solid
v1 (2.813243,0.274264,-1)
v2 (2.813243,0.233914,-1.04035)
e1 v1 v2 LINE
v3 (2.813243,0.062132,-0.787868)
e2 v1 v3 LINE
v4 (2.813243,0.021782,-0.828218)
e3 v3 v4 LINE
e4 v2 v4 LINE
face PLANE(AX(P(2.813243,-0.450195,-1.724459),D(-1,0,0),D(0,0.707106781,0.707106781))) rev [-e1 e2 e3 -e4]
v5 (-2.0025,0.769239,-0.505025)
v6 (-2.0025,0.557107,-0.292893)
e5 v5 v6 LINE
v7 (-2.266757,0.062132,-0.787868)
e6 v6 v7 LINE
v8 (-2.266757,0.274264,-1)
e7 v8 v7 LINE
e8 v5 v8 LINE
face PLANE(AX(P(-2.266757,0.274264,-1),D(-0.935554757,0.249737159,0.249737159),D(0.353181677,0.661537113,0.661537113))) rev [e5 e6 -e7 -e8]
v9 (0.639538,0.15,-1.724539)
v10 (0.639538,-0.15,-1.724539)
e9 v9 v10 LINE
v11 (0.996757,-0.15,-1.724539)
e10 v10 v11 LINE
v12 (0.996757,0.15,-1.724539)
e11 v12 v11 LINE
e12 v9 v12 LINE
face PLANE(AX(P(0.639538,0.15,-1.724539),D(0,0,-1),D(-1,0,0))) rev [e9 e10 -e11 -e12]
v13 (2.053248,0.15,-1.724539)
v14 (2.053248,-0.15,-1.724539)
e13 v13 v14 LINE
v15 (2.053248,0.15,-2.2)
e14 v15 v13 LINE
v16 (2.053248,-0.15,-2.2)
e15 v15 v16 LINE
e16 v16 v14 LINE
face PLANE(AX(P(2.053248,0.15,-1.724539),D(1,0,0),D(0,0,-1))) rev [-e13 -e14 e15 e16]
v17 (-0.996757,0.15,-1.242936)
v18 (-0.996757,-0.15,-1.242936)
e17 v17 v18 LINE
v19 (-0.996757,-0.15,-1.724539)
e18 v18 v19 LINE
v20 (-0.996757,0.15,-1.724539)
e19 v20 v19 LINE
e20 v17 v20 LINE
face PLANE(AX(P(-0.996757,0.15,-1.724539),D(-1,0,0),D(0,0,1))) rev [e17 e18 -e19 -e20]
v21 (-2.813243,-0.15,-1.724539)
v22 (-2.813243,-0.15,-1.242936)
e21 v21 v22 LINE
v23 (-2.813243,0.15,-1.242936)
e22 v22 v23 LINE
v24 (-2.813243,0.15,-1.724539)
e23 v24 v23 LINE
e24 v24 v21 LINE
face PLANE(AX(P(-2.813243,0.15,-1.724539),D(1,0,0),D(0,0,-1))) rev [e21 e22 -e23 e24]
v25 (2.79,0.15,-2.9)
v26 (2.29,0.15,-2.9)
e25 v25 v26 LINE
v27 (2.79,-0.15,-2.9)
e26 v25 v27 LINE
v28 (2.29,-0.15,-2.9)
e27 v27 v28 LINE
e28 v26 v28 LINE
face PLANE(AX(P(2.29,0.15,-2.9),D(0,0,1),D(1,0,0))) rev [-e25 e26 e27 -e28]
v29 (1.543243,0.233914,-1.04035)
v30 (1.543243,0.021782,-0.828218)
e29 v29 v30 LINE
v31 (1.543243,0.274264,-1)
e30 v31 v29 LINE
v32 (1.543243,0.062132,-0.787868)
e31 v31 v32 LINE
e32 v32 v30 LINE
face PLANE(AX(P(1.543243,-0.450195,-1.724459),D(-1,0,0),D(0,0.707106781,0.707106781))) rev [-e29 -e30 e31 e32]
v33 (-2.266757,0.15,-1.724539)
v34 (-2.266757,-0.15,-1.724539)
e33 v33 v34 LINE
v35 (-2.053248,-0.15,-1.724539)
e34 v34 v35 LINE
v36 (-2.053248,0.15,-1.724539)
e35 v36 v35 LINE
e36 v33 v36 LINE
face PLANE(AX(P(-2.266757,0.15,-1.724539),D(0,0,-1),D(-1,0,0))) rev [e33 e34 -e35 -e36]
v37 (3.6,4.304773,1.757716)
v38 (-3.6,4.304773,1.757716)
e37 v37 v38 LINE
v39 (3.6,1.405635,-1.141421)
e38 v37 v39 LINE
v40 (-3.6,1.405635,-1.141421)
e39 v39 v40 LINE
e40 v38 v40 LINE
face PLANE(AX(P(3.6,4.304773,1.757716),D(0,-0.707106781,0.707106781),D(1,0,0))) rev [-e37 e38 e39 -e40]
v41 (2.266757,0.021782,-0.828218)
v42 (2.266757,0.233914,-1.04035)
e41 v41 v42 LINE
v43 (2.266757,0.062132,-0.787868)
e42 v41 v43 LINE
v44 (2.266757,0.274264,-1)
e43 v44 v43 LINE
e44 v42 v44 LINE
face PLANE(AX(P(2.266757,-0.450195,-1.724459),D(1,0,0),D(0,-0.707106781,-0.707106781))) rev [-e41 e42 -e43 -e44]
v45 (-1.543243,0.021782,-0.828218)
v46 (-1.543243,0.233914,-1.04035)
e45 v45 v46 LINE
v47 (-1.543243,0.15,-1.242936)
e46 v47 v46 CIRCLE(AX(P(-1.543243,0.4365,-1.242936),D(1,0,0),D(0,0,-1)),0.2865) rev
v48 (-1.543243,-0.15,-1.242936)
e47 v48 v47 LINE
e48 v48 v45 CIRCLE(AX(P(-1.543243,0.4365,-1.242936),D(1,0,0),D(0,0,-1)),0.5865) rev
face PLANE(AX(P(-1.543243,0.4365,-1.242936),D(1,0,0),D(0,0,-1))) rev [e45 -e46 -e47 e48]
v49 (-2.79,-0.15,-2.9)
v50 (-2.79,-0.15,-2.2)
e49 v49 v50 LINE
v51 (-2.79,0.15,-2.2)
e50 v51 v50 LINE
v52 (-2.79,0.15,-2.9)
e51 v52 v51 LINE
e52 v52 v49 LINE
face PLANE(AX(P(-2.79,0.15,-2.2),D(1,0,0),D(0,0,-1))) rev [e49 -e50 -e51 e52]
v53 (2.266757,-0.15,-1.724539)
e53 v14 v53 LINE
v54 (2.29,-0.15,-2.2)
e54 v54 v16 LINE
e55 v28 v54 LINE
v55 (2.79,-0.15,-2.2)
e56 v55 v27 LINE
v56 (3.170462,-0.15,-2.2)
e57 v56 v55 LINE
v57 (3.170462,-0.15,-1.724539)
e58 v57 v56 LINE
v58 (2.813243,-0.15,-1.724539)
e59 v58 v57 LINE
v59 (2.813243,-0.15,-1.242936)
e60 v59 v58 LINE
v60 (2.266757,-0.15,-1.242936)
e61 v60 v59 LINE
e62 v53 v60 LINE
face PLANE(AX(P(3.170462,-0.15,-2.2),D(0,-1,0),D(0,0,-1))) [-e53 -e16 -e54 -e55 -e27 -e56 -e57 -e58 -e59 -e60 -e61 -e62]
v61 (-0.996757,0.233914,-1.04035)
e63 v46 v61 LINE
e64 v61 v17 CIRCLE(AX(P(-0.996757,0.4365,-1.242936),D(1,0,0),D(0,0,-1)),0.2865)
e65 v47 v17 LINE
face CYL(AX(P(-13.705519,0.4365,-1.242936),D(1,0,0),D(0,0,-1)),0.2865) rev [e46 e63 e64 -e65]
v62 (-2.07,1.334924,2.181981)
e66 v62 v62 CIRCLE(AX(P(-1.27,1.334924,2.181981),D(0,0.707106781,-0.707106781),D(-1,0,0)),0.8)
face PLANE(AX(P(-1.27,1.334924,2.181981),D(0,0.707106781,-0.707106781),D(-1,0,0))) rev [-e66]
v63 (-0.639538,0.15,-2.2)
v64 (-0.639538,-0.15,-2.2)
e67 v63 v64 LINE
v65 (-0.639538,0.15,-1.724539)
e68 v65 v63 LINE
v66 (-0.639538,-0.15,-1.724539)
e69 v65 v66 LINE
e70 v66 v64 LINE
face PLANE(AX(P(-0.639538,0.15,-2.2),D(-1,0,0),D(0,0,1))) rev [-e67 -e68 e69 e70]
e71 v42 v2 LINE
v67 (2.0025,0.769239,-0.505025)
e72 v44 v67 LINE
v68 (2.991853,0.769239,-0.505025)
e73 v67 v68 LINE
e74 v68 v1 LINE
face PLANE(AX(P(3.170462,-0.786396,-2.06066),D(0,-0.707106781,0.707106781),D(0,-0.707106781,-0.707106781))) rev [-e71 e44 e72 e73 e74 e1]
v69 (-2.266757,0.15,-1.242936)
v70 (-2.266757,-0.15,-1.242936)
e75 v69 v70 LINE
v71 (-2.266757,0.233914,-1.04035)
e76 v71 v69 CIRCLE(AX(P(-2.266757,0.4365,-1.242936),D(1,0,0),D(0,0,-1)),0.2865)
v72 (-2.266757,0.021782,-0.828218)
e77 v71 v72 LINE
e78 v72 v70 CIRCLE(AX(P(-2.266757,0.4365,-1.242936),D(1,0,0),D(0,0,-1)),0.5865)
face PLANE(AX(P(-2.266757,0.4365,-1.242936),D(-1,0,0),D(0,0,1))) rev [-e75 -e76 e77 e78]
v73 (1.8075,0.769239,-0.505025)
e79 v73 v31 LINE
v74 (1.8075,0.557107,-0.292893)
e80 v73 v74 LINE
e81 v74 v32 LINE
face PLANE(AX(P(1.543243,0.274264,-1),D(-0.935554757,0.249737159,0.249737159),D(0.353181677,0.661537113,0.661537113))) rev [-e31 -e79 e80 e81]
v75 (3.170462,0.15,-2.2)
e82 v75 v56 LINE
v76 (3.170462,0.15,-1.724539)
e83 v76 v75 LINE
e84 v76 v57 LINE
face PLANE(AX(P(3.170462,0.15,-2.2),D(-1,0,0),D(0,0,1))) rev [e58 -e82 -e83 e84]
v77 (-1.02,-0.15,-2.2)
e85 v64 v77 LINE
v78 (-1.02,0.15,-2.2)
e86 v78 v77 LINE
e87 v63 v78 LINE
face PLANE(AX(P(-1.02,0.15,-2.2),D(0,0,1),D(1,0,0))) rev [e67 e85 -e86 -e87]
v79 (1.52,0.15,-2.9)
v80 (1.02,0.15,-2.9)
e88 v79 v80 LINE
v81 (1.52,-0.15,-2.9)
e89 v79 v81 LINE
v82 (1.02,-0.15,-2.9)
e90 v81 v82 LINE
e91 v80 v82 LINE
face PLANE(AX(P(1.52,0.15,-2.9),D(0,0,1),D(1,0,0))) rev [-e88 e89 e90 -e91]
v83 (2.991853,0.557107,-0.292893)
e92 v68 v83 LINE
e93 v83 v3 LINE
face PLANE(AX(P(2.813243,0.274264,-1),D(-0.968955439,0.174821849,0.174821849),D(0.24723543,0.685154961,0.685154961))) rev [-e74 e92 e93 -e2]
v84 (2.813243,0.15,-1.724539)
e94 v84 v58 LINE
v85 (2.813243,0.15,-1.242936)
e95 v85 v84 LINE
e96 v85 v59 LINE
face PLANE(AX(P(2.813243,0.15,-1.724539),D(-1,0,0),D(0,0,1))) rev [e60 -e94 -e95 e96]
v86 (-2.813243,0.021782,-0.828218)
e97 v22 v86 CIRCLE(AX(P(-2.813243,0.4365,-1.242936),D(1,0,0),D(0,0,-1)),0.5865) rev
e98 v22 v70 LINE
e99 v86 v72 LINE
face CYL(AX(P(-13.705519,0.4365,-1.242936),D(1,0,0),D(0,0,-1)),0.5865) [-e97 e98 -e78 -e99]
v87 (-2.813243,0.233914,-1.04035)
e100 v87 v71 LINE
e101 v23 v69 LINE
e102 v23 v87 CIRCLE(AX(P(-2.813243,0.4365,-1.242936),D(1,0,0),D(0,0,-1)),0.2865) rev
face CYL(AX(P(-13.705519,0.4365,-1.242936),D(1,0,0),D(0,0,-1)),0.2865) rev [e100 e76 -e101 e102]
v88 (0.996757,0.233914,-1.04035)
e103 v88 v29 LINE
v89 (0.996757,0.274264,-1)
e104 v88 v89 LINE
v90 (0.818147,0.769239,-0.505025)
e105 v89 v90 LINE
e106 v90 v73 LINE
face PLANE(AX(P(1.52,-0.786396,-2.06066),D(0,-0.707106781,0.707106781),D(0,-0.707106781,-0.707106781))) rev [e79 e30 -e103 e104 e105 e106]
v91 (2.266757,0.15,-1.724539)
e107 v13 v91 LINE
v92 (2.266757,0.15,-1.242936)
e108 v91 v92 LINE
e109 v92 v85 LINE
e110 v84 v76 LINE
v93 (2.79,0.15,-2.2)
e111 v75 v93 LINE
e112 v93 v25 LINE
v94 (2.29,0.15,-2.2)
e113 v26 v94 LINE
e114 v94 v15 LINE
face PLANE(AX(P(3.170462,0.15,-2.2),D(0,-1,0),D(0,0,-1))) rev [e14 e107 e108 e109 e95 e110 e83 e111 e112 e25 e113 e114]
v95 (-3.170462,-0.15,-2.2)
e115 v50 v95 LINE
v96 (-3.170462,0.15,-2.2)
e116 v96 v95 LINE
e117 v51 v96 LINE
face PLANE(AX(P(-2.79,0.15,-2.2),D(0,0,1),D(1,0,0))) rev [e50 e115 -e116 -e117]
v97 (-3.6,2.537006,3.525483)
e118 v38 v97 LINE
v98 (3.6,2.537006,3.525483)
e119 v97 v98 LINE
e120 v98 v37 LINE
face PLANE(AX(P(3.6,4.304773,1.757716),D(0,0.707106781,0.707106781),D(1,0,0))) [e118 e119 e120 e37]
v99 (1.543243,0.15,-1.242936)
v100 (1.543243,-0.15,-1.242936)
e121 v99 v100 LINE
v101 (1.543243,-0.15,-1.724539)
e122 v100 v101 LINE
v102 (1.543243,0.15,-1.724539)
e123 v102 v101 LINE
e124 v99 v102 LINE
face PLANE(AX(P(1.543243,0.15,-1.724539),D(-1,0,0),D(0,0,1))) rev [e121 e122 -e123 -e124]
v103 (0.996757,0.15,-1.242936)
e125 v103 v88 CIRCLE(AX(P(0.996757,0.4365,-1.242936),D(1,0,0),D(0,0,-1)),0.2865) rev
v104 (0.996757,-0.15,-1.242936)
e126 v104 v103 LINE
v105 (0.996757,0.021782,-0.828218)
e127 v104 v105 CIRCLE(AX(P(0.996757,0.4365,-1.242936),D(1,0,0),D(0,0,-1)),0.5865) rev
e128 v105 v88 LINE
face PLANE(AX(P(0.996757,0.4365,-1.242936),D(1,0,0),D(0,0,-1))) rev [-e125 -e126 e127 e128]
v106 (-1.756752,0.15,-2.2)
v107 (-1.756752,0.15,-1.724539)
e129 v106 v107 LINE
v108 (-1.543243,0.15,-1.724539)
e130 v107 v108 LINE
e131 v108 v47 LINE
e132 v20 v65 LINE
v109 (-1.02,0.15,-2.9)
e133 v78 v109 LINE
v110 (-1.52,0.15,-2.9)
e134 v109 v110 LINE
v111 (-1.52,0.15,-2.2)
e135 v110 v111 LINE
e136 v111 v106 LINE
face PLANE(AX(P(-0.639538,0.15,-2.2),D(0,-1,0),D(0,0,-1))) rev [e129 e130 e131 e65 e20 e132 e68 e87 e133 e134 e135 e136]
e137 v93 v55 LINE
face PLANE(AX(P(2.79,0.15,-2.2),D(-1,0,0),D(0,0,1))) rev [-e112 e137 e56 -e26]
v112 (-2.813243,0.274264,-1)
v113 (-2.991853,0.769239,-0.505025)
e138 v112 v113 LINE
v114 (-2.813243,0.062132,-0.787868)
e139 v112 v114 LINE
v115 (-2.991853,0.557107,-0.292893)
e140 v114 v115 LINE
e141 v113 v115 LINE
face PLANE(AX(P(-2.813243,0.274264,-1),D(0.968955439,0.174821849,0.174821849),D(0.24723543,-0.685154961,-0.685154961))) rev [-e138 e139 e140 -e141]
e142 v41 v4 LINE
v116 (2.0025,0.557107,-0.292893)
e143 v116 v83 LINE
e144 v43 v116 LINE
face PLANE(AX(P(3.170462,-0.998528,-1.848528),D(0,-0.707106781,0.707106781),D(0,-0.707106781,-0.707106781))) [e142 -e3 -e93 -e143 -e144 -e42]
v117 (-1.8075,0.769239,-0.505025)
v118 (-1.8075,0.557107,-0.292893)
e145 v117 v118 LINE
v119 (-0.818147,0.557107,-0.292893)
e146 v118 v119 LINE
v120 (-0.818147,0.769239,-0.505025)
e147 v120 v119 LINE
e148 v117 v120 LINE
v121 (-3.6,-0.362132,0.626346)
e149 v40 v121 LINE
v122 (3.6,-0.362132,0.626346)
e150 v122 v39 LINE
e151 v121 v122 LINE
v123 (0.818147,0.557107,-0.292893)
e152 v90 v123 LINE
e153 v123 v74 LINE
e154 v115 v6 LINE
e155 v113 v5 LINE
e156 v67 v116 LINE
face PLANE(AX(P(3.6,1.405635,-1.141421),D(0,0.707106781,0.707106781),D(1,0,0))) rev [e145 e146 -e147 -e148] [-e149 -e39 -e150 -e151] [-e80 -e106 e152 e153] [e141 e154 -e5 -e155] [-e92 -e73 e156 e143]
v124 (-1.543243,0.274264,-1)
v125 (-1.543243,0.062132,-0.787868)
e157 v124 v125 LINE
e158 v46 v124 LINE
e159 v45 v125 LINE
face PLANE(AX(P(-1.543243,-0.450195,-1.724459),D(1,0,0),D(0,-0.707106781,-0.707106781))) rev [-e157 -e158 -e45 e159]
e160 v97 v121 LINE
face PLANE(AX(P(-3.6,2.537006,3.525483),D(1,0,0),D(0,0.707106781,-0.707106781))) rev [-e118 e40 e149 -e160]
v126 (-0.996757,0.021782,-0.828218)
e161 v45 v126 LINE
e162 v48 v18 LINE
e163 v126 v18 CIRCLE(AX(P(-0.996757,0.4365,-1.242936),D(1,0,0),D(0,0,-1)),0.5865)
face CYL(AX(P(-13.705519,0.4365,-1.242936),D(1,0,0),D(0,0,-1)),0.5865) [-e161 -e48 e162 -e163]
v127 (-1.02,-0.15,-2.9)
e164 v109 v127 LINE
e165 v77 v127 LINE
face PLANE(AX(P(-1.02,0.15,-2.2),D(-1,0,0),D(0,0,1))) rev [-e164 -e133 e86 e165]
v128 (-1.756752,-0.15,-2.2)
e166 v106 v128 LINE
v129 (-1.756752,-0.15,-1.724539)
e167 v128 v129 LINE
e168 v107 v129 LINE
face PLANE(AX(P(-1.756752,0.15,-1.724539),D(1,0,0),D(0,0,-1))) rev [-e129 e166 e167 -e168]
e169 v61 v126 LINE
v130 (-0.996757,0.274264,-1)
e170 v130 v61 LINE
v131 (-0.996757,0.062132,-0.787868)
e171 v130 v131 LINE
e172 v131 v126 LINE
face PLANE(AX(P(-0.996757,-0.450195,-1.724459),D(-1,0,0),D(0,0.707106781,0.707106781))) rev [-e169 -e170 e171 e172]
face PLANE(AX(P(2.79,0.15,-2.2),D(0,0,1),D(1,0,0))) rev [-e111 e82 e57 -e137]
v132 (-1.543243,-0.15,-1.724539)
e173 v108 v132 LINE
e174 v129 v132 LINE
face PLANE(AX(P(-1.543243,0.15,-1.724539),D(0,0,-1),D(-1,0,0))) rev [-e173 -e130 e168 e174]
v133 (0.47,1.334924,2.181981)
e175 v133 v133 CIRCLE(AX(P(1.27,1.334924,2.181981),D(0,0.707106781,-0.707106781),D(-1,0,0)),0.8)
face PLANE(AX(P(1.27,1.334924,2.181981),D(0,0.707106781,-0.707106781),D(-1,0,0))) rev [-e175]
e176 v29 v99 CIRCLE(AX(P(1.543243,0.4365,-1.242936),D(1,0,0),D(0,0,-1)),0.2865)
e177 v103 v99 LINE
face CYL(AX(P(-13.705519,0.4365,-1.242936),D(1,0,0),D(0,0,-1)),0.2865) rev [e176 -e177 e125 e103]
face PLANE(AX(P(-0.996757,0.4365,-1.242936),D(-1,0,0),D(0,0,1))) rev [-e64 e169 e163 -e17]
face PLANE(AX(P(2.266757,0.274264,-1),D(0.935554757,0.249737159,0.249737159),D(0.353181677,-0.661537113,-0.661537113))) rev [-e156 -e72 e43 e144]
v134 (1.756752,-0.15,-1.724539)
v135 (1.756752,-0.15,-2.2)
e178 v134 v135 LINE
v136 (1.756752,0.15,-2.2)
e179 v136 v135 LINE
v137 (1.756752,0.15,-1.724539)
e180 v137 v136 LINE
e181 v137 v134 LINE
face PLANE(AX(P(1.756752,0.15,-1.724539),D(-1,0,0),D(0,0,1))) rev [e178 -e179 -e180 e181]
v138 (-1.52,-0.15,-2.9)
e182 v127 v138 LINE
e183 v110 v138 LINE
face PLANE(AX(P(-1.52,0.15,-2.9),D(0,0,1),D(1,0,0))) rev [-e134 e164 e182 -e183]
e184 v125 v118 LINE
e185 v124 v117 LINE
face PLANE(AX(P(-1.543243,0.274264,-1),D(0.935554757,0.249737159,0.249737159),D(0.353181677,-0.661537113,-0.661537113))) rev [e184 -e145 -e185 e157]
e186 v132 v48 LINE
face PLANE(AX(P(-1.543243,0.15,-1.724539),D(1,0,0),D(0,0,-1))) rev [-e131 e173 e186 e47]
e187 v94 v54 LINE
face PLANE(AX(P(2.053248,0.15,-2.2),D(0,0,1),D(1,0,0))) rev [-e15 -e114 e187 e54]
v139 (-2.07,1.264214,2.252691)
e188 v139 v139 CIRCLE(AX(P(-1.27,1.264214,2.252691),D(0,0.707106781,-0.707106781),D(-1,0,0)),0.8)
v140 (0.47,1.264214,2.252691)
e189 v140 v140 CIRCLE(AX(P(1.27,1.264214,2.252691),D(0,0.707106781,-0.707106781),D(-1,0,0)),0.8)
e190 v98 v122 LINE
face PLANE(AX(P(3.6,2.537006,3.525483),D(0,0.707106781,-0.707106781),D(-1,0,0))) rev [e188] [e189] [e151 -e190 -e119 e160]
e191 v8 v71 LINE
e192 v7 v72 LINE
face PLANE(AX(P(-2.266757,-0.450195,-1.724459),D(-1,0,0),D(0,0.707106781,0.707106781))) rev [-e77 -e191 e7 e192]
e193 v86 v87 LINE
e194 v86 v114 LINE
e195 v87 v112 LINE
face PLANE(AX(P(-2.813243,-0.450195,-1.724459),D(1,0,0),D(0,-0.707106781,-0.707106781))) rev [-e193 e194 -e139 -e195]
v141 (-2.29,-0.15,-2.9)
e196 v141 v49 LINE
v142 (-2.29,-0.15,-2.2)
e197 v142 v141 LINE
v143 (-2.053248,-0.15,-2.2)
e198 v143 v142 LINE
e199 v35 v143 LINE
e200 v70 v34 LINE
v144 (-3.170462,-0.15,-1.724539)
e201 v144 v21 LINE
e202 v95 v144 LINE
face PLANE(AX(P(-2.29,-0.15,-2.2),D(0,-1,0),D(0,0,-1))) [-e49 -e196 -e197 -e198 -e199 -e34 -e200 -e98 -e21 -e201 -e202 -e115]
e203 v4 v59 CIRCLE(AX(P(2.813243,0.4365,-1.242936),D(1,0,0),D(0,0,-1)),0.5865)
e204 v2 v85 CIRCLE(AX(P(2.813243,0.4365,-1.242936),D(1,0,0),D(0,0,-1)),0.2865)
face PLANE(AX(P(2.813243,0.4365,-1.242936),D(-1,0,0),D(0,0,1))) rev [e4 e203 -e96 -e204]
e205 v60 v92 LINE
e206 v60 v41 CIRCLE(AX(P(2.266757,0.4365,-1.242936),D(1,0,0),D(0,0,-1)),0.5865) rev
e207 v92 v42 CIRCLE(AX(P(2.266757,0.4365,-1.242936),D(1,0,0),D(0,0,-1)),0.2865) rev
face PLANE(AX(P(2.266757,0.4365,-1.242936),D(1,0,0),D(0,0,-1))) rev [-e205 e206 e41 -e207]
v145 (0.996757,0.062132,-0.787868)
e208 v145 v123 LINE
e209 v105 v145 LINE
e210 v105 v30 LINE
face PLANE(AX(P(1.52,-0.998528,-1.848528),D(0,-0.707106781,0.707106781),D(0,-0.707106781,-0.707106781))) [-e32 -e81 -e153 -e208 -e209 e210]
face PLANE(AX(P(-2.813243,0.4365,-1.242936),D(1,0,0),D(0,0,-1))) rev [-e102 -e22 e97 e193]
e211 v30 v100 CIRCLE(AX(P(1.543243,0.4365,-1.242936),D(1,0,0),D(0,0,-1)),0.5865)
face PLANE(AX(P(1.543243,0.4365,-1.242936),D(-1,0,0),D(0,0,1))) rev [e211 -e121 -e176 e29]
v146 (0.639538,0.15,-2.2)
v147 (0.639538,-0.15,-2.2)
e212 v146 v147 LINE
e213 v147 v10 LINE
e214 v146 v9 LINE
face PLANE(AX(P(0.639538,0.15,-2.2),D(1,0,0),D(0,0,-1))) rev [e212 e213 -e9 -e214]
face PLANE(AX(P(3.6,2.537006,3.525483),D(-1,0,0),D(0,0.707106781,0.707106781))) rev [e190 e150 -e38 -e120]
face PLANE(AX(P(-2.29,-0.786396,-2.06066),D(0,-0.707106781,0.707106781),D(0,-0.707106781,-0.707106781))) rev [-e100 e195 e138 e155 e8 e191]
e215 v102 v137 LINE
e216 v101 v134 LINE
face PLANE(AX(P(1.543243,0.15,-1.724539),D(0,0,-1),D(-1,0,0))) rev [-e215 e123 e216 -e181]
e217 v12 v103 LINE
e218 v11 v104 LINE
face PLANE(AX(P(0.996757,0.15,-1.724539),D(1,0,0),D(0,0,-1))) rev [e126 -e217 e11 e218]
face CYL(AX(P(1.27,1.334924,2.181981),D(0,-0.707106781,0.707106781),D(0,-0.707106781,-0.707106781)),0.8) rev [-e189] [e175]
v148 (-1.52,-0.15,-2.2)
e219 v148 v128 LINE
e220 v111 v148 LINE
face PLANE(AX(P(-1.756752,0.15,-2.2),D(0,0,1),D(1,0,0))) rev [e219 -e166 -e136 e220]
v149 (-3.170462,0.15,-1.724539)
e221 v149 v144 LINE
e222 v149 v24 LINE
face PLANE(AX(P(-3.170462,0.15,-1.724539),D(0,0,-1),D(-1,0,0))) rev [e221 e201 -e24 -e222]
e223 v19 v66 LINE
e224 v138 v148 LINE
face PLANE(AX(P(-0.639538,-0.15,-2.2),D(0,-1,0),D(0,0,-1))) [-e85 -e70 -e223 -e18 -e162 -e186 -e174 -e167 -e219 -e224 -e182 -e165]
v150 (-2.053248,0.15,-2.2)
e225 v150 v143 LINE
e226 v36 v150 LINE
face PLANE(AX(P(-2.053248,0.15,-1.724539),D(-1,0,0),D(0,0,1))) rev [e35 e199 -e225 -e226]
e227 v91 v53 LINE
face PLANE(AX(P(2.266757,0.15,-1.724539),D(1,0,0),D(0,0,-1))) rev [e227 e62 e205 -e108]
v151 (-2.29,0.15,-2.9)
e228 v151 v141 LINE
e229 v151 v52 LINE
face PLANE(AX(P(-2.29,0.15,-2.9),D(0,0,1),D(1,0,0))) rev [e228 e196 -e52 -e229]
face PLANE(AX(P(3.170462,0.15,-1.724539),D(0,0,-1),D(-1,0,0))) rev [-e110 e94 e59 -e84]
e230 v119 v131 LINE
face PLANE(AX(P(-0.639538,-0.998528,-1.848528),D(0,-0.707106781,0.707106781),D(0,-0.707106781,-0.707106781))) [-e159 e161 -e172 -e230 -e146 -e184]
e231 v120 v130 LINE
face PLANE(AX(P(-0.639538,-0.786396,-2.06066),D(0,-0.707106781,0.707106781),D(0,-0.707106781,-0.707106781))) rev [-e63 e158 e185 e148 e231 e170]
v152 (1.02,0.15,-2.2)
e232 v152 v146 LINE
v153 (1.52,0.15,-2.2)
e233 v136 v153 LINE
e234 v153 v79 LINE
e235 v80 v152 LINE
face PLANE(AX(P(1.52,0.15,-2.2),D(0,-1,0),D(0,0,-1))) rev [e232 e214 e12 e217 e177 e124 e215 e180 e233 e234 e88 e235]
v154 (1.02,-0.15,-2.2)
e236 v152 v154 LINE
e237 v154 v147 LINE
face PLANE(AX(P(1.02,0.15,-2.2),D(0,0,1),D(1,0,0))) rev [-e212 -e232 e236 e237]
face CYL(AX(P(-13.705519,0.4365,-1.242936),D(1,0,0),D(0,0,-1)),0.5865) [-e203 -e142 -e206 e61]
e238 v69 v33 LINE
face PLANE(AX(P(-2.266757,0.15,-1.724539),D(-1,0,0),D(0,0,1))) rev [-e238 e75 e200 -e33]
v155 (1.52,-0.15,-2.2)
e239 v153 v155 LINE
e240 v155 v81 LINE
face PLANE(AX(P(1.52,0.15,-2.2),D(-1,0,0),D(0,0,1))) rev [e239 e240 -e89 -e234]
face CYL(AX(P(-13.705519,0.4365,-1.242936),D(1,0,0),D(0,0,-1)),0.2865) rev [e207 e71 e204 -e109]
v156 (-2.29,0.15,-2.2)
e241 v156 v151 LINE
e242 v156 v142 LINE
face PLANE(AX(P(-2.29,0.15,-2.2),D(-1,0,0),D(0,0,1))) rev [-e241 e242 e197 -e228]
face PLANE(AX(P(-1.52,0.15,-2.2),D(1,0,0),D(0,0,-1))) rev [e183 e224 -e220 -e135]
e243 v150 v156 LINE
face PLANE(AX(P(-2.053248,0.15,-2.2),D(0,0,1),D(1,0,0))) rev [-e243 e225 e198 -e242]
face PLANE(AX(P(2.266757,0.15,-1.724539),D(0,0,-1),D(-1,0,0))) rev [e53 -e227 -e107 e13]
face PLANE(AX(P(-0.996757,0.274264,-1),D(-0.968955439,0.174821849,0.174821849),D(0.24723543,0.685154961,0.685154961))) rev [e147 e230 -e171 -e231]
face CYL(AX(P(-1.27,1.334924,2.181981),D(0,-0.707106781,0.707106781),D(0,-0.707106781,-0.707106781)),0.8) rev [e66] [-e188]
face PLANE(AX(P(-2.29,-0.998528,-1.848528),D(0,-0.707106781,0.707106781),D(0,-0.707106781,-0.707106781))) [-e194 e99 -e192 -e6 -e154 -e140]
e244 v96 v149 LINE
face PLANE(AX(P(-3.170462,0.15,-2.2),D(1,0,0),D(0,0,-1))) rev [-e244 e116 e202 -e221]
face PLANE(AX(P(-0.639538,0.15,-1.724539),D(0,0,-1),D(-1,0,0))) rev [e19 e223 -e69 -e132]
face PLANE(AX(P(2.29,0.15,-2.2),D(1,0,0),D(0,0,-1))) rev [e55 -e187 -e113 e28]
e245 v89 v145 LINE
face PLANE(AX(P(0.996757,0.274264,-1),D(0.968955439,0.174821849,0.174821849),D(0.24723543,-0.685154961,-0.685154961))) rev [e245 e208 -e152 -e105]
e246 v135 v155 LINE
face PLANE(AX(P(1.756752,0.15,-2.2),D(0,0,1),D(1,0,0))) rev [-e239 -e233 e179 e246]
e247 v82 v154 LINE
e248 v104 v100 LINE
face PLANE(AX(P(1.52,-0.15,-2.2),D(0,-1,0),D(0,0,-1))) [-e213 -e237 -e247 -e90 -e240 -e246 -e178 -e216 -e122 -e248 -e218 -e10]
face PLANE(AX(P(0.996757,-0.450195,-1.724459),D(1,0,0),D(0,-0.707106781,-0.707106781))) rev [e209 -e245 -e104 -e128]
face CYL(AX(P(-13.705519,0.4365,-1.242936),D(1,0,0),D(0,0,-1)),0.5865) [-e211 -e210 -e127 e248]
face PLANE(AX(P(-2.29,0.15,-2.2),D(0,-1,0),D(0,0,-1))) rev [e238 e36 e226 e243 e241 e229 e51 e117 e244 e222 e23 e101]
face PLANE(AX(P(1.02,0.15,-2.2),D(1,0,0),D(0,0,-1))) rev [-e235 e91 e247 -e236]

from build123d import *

# Parameters (mm, degrees)
ESQUISSE2_W          = 7.2
ESQUISSE2_H          = 2.5
BOITIER_DEPTH        = 4.1
FENETRECAPTEUR_START = -1.45
ESQUISSE4_R          = 0.8
FENETRECAPTEUR_DEPTH = 0.1
PATTES_DEPTH         = 0.15
PLIAGE_START         = -5
PLIAGE_1_OUTLINE_W   = 7.2
PLIAGE_1_OUTLINE_H   = 4.1
PLIAGE_1_DEPTH       = 4.301040764
PLIAGE_START_2       = -0.698959236
PLIAGE_1_2_OUTLINE_R = 0.8
PLIAGE_1_2_DEPTH     = 0.1
PLIAGE_START_3       = -0.598959236
PLIAGE_1_3_OUTLINE_W = 7.2
PLIAGE_1_3_OUTLINE_H = 4.1
PLIAGE_1_3_DEPTH     = 2.4
PLIAGE_1_4_OUTLINE_W = 7.2
PLIAGE_1_4_OUTLINE_H = 4.1
PLIAGE_1_4_OUTLINE_R = 0.8
PLIAGE_1_4_DEPTH     = 0.1
PLIAGE_START_4       = -3.6
PLIAGE_1_5_DEPTH     = 7.2
PLIAGE_START_5       = -2.813242849
PLIAGE_1_6_DEPTH     = 0.546485698
PLIAGE_START_6       = -1.543242849
PLIAGE_1_7_DEPTH     = 0.546485698
PLIAGE_START_7       = 0.996757151
PLIAGE_1_8_DEPTH     = 0.546485698
PLIAGE_START_8       = 2.266757151
PLIAGE_1_9_DEPTH     = 0.546485698
PLIAGE_START_9       = 0.601040763
PLIAGE_1_10_DEPTH    = 0.300000001


with BuildPart() as part:
    # Esquisse2 → Boitier (new body)
    with BuildSketch(Plane.XY):
        with Locations((0, -0.2)):
            Rectangle(ESQUISSE2_W, ESQUISSE2_H)
    extrude(amount=BOITIER_DEPTH)

    # Esquisse4 → FenetreCapteur (cut)
    with BuildSketch(Plane(origin=(0, 0, 0), x_dir=(1, 0, 0), z_dir=(0, 1, 0)).offset(FENETRECAPTEUR_START)):
        with Locations(Location((-1.27, -2.3, 0), (0, 0, 180))):
            Circle(ESQUISSE4_R)
        with Locations(Location((1.27, -2.3, 0), (0, 0, 180))):
            Circle(ESQUISSE4_R)
    extrude(amount=FENETRECAPTEUR_DEPTH, mode=Mode.SUBTRACT)

    # Esquisse5 → Pattes (add, symmetric)
    with BuildSketch(Plane(origin=(0, 0, 0), x_dir=(1, 0, 0), z_dir=(0, 1, 0))):
        Polygon((2.79, 2.2), (2.79, 2.9), (2.29, 2.9), (2.29, 2.2), (2.053248267, 2.2), (2.053248267, 1.724539267), (2.266757151, 1.724539267), (2.266757151, 0.7), (2.002499851, 0), (2.991852509, 0), (2.813242849, 0.7), (2.813242849, 1.724539267), (3.170462168, 1.724539267), (3.170462168, 2.2), align=None)
        Polygon((1.52, 2.2), (1.52, 2.9), (1.02, 2.9), (1.02, 2.2), (0.639537832, 2.2), (0.639537832, 1.724539267), (0.996757151, 1.724539267), (0.996757151, 0.7), (0.818147491, 0), (1.807500149, 0), (1.543242849, 0.7), (1.543242849, 1.724539267), (1.756751733, 1.724539267), (1.756751733, 2.2), align=None)
        Polygon((-1.02, 2.2), (-1.02, 2.9), (-1.52, 2.9), (-1.52, 2.2), (-1.756751733, 2.2), (-1.756751733, 1.724539267), (-1.543242849, 1.724539267), (-1.543242849, 0.7), (-1.807500149, 0), (-0.818147491, 0), (-0.996757151, 0.7), (-0.996757151, 1.724539267), (-0.639537832, 1.724539267), (-0.639537832, 2.2), align=None)
        Polygon((-2.29, 2.2), (-2.29, 2.9), (-2.79, 2.9), (-2.79, 2.2), (-3.170462168, 2.2), (-3.170462168, 1.724539267), (-2.813242849, 1.724539267), (-2.813242849, 0.7), (-2.991852509, 0), (-2.002499851, 0), (-2.266757151, 0.7), (-2.266757151, 1.724539267), (-2.053248267, 1.724539267), (-2.053248267, 2.2), align=None)
    extrude(amount=PATTES_DEPTH, both=True)

    # Pliage 1: read off the stored shape, not the designer's step
    # Pliage 1 outline → Pliage 1 (cut)
    with BuildSketch(Plane(origin=(0, 0, 0), x_dir=(1, 0, 0), z_dir=(0, 0.707106781186546, -0.707106781186549)).offset(PLIAGE_START)):
        with Locations((0, -2.236827202)):
            Rectangle(PLIAGE_1_OUTLINE_W, PLIAGE_1_OUTLINE_H)
    extrude(amount=PLIAGE_1_DEPTH, mode=Mode.SUBTRACT)

    # Pliage 1 2 outline → Pliage 1 2 (cut)
    with BuildSketch(Plane(origin=(0, 0, 0), x_dir=(1, 0, 0), z_dir=(0, 0.707106781186546, -0.707106781186549)).offset(PLIAGE_START_2)):
        with Locations((-1.27, -2.486827202)):
            Circle(PLIAGE_1_2_OUTLINE_R)
        with Locations((1.27, -2.486827202)):
            Circle(PLIAGE_1_2_OUTLINE_R)
    extrude(amount=PLIAGE_1_2_DEPTH, mode=Mode.SUBTRACT)

    # Pliage 1 3 outline → Pliage 1 3 (add)
    with BuildSketch(Plane(origin=(0, 0, 0), x_dir=(1, 0, 0), z_dir=(0, 0.707106781186546, -0.707106781186549)).offset(PLIAGE_START_3)):
        with Locations((0, -2.236827202)):
            Rectangle(PLIAGE_1_3_OUTLINE_W, PLIAGE_1_3_OUTLINE_H)
    extrude(amount=PLIAGE_1_3_DEPTH)

    # Pliage 1 4 outline → Pliage 1 4 (add)
    with BuildSketch(Plane(origin=(0, 0, 0), x_dir=(1, 0, 0), z_dir=(0, 0.707106781186546, -0.707106781186549)).offset(PLIAGE_START_2)):
        with Locations((0, -2.236827202)):
            Rectangle(PLIAGE_1_4_OUTLINE_W, PLIAGE_1_4_OUTLINE_H)
        with Locations((-1.27, -2.486827202)):
            Circle(PLIAGE_1_4_OUTLINE_R, mode=Mode.SUBTRACT)
        with Locations((1.27, -2.486827202)):
            Circle(PLIAGE_1_4_OUTLINE_R, mode=Mode.SUBTRACT)
    extrude(amount=PLIAGE_1_4_DEPTH)

    # Pliage 1 5 outline → Pliage 1 5 (cut)
    with BuildSketch(Plane.YZ.offset(PLIAGE_START_4)):
        with BuildLine():
            Line((0.021781873, -0.828218127), (0.15, -0.7))
            Line((0.15, -0.7), (0.15, 0))
            Line((0.15, 0), (0.264213563, 0))
            Line((0.264213563, 0), (-1.35, 1.614213563))
            Line((-1.35, 1.614213563), (-1.45, 1.714213563))
            Line((-1.45, 1.714213563), (-1.45, 0))
            Line((-1.45, 0), (-0.15, 0))
            Line((-0.15, 0), (-0.15, -1.242936254))
            ThreePointArc((-0.15, -1.242936254), (-0.105355346, -1.018492421), (0.021781873, -0.828218127))
        make_face()
    extrude(amount=PLIAGE_1_5_DEPTH, mode=Mode.SUBTRACT)

    # Pliage 1 6 outline → Pliage 1 6 (add)
    with BuildSketch(Plane.YZ.offset(PLIAGE_START_5)):
        with BuildLine():
            Line((0.769238816, -0.505025253), (0.557106781, -0.292893218))
            Line((0.557106781, -0.292893218), (0.15, -0.7))
            Line((0.15, -0.7), (0.15, -1.242936254))
            ThreePointArc((0.15, -1.242936254), (0.171808514, -1.133297451), (0.233913907, -1.040350162))
            Line((0.233913907, -1.040350162), (0.769238816, -0.505025253))
        make_face()
    extrude(amount=PLIAGE_1_6_DEPTH)

    # Pliage 1 7 outline → Pliage 1 7 (add)
    with BuildSketch(Plane.YZ.offset(PLIAGE_START_6)):
        with BuildLine():
            Line((0.769238816, -0.505025253), (0.557106781, -0.292893218))
            Line((0.557106781, -0.292893218), (0.15, -0.7))
            Line((0.15, -0.7), (0.15, -1.242936254))
            ThreePointArc((0.15, -1.242936254), (0.171808514, -1.133297451), (0.233913907, -1.040350162))
            Line((0.233913907, -1.040350162), (0.769238816, -0.505025253))
        make_face()
    extrude(amount=PLIAGE_1_7_DEPTH)

    # Pliage 1 8 outline → Pliage 1 8 (add)
    with BuildSketch(Plane.YZ.offset(PLIAGE_START_7)):
        with BuildLine():
            Line((0.769238816, -0.505025253), (0.557106781, -0.292893218))
            Line((0.557106781, -0.292893218), (0.15, -0.7))
            Line((0.15, -0.7), (0.15, -1.242936254))
            ThreePointArc((0.15, -1.242936254), (0.171808514, -1.133297451), (0.233913907, -1.040350162))
            Line((0.233913907, -1.040350162), (0.769238816, -0.505025253))
        make_face()
    extrude(amount=PLIAGE_1_8_DEPTH)

    # Pliage 1 9 outline → Pliage 1 9 (add)
    with BuildSketch(Plane.YZ.offset(PLIAGE_START_8)):
        with BuildLine():
            Line((0.769238816, -0.505025253), (0.557106781, -0.292893218))
            Line((0.557106781, -0.292893218), (0.15, -0.7))
            Line((0.15, -0.7), (0.15, -1.242936254))
            ThreePointArc((0.15, -1.242936254), (0.171808514, -1.133297451), (0.233913907, -1.040350162))
            Line((0.233913907, -1.040350162), (0.769238816, -0.505025253))
        make_face()
    extrude(amount=PLIAGE_1_9_DEPTH)

    # Pliage 1 10 outline → Pliage 1 10 (add)
    with BuildSketch(Plane(origin=(0, 0, 0), x_dir=(1, 0, 0), z_dir=(0, 0.707106781186546, -0.707106781186549)).offset(PLIAGE_START_9)):
        Polygon((2.813242849, 0.513172798), (2.813242849, -0.186827202), (2.991852509, -0.186827202), align=None)
        Polygon((-2.991852509, -0.186827202), (-2.813242849, -0.186827202), (-2.813242849, 0.513172798), align=None)
        Polygon((-2.266757151, -0.186827202), (-2.002499851, -0.186827202), (-2.266757151, 0.513172798), align=None)
        Polygon((-1.807500149, -0.186827202), (-1.543242849, -0.186827202), (-1.543242849, 0.513172798), align=None)
        Polygon((-0.996757151, -0.186827202), (-0.818147491, -0.186827202), (-0.996757151, 0.513172798), align=None)
        Polygon((0.818147491, -0.186827202), (0.996757151, -0.186827202), (0.996757151, 0.513172798), align=None)
        Polygon((1.543242849, -0.186827202), (1.807500149, -0.186827202), (1.543242849, 0.513172798), align=None)
        Polygon((2.266757151, 0.513172798), (2.002499851, -0.186827202), (2.266757151, -0.186827202), align=None)
    extrude(amount=PLIAGE_1_10_DEPTH)


solid = part.part
